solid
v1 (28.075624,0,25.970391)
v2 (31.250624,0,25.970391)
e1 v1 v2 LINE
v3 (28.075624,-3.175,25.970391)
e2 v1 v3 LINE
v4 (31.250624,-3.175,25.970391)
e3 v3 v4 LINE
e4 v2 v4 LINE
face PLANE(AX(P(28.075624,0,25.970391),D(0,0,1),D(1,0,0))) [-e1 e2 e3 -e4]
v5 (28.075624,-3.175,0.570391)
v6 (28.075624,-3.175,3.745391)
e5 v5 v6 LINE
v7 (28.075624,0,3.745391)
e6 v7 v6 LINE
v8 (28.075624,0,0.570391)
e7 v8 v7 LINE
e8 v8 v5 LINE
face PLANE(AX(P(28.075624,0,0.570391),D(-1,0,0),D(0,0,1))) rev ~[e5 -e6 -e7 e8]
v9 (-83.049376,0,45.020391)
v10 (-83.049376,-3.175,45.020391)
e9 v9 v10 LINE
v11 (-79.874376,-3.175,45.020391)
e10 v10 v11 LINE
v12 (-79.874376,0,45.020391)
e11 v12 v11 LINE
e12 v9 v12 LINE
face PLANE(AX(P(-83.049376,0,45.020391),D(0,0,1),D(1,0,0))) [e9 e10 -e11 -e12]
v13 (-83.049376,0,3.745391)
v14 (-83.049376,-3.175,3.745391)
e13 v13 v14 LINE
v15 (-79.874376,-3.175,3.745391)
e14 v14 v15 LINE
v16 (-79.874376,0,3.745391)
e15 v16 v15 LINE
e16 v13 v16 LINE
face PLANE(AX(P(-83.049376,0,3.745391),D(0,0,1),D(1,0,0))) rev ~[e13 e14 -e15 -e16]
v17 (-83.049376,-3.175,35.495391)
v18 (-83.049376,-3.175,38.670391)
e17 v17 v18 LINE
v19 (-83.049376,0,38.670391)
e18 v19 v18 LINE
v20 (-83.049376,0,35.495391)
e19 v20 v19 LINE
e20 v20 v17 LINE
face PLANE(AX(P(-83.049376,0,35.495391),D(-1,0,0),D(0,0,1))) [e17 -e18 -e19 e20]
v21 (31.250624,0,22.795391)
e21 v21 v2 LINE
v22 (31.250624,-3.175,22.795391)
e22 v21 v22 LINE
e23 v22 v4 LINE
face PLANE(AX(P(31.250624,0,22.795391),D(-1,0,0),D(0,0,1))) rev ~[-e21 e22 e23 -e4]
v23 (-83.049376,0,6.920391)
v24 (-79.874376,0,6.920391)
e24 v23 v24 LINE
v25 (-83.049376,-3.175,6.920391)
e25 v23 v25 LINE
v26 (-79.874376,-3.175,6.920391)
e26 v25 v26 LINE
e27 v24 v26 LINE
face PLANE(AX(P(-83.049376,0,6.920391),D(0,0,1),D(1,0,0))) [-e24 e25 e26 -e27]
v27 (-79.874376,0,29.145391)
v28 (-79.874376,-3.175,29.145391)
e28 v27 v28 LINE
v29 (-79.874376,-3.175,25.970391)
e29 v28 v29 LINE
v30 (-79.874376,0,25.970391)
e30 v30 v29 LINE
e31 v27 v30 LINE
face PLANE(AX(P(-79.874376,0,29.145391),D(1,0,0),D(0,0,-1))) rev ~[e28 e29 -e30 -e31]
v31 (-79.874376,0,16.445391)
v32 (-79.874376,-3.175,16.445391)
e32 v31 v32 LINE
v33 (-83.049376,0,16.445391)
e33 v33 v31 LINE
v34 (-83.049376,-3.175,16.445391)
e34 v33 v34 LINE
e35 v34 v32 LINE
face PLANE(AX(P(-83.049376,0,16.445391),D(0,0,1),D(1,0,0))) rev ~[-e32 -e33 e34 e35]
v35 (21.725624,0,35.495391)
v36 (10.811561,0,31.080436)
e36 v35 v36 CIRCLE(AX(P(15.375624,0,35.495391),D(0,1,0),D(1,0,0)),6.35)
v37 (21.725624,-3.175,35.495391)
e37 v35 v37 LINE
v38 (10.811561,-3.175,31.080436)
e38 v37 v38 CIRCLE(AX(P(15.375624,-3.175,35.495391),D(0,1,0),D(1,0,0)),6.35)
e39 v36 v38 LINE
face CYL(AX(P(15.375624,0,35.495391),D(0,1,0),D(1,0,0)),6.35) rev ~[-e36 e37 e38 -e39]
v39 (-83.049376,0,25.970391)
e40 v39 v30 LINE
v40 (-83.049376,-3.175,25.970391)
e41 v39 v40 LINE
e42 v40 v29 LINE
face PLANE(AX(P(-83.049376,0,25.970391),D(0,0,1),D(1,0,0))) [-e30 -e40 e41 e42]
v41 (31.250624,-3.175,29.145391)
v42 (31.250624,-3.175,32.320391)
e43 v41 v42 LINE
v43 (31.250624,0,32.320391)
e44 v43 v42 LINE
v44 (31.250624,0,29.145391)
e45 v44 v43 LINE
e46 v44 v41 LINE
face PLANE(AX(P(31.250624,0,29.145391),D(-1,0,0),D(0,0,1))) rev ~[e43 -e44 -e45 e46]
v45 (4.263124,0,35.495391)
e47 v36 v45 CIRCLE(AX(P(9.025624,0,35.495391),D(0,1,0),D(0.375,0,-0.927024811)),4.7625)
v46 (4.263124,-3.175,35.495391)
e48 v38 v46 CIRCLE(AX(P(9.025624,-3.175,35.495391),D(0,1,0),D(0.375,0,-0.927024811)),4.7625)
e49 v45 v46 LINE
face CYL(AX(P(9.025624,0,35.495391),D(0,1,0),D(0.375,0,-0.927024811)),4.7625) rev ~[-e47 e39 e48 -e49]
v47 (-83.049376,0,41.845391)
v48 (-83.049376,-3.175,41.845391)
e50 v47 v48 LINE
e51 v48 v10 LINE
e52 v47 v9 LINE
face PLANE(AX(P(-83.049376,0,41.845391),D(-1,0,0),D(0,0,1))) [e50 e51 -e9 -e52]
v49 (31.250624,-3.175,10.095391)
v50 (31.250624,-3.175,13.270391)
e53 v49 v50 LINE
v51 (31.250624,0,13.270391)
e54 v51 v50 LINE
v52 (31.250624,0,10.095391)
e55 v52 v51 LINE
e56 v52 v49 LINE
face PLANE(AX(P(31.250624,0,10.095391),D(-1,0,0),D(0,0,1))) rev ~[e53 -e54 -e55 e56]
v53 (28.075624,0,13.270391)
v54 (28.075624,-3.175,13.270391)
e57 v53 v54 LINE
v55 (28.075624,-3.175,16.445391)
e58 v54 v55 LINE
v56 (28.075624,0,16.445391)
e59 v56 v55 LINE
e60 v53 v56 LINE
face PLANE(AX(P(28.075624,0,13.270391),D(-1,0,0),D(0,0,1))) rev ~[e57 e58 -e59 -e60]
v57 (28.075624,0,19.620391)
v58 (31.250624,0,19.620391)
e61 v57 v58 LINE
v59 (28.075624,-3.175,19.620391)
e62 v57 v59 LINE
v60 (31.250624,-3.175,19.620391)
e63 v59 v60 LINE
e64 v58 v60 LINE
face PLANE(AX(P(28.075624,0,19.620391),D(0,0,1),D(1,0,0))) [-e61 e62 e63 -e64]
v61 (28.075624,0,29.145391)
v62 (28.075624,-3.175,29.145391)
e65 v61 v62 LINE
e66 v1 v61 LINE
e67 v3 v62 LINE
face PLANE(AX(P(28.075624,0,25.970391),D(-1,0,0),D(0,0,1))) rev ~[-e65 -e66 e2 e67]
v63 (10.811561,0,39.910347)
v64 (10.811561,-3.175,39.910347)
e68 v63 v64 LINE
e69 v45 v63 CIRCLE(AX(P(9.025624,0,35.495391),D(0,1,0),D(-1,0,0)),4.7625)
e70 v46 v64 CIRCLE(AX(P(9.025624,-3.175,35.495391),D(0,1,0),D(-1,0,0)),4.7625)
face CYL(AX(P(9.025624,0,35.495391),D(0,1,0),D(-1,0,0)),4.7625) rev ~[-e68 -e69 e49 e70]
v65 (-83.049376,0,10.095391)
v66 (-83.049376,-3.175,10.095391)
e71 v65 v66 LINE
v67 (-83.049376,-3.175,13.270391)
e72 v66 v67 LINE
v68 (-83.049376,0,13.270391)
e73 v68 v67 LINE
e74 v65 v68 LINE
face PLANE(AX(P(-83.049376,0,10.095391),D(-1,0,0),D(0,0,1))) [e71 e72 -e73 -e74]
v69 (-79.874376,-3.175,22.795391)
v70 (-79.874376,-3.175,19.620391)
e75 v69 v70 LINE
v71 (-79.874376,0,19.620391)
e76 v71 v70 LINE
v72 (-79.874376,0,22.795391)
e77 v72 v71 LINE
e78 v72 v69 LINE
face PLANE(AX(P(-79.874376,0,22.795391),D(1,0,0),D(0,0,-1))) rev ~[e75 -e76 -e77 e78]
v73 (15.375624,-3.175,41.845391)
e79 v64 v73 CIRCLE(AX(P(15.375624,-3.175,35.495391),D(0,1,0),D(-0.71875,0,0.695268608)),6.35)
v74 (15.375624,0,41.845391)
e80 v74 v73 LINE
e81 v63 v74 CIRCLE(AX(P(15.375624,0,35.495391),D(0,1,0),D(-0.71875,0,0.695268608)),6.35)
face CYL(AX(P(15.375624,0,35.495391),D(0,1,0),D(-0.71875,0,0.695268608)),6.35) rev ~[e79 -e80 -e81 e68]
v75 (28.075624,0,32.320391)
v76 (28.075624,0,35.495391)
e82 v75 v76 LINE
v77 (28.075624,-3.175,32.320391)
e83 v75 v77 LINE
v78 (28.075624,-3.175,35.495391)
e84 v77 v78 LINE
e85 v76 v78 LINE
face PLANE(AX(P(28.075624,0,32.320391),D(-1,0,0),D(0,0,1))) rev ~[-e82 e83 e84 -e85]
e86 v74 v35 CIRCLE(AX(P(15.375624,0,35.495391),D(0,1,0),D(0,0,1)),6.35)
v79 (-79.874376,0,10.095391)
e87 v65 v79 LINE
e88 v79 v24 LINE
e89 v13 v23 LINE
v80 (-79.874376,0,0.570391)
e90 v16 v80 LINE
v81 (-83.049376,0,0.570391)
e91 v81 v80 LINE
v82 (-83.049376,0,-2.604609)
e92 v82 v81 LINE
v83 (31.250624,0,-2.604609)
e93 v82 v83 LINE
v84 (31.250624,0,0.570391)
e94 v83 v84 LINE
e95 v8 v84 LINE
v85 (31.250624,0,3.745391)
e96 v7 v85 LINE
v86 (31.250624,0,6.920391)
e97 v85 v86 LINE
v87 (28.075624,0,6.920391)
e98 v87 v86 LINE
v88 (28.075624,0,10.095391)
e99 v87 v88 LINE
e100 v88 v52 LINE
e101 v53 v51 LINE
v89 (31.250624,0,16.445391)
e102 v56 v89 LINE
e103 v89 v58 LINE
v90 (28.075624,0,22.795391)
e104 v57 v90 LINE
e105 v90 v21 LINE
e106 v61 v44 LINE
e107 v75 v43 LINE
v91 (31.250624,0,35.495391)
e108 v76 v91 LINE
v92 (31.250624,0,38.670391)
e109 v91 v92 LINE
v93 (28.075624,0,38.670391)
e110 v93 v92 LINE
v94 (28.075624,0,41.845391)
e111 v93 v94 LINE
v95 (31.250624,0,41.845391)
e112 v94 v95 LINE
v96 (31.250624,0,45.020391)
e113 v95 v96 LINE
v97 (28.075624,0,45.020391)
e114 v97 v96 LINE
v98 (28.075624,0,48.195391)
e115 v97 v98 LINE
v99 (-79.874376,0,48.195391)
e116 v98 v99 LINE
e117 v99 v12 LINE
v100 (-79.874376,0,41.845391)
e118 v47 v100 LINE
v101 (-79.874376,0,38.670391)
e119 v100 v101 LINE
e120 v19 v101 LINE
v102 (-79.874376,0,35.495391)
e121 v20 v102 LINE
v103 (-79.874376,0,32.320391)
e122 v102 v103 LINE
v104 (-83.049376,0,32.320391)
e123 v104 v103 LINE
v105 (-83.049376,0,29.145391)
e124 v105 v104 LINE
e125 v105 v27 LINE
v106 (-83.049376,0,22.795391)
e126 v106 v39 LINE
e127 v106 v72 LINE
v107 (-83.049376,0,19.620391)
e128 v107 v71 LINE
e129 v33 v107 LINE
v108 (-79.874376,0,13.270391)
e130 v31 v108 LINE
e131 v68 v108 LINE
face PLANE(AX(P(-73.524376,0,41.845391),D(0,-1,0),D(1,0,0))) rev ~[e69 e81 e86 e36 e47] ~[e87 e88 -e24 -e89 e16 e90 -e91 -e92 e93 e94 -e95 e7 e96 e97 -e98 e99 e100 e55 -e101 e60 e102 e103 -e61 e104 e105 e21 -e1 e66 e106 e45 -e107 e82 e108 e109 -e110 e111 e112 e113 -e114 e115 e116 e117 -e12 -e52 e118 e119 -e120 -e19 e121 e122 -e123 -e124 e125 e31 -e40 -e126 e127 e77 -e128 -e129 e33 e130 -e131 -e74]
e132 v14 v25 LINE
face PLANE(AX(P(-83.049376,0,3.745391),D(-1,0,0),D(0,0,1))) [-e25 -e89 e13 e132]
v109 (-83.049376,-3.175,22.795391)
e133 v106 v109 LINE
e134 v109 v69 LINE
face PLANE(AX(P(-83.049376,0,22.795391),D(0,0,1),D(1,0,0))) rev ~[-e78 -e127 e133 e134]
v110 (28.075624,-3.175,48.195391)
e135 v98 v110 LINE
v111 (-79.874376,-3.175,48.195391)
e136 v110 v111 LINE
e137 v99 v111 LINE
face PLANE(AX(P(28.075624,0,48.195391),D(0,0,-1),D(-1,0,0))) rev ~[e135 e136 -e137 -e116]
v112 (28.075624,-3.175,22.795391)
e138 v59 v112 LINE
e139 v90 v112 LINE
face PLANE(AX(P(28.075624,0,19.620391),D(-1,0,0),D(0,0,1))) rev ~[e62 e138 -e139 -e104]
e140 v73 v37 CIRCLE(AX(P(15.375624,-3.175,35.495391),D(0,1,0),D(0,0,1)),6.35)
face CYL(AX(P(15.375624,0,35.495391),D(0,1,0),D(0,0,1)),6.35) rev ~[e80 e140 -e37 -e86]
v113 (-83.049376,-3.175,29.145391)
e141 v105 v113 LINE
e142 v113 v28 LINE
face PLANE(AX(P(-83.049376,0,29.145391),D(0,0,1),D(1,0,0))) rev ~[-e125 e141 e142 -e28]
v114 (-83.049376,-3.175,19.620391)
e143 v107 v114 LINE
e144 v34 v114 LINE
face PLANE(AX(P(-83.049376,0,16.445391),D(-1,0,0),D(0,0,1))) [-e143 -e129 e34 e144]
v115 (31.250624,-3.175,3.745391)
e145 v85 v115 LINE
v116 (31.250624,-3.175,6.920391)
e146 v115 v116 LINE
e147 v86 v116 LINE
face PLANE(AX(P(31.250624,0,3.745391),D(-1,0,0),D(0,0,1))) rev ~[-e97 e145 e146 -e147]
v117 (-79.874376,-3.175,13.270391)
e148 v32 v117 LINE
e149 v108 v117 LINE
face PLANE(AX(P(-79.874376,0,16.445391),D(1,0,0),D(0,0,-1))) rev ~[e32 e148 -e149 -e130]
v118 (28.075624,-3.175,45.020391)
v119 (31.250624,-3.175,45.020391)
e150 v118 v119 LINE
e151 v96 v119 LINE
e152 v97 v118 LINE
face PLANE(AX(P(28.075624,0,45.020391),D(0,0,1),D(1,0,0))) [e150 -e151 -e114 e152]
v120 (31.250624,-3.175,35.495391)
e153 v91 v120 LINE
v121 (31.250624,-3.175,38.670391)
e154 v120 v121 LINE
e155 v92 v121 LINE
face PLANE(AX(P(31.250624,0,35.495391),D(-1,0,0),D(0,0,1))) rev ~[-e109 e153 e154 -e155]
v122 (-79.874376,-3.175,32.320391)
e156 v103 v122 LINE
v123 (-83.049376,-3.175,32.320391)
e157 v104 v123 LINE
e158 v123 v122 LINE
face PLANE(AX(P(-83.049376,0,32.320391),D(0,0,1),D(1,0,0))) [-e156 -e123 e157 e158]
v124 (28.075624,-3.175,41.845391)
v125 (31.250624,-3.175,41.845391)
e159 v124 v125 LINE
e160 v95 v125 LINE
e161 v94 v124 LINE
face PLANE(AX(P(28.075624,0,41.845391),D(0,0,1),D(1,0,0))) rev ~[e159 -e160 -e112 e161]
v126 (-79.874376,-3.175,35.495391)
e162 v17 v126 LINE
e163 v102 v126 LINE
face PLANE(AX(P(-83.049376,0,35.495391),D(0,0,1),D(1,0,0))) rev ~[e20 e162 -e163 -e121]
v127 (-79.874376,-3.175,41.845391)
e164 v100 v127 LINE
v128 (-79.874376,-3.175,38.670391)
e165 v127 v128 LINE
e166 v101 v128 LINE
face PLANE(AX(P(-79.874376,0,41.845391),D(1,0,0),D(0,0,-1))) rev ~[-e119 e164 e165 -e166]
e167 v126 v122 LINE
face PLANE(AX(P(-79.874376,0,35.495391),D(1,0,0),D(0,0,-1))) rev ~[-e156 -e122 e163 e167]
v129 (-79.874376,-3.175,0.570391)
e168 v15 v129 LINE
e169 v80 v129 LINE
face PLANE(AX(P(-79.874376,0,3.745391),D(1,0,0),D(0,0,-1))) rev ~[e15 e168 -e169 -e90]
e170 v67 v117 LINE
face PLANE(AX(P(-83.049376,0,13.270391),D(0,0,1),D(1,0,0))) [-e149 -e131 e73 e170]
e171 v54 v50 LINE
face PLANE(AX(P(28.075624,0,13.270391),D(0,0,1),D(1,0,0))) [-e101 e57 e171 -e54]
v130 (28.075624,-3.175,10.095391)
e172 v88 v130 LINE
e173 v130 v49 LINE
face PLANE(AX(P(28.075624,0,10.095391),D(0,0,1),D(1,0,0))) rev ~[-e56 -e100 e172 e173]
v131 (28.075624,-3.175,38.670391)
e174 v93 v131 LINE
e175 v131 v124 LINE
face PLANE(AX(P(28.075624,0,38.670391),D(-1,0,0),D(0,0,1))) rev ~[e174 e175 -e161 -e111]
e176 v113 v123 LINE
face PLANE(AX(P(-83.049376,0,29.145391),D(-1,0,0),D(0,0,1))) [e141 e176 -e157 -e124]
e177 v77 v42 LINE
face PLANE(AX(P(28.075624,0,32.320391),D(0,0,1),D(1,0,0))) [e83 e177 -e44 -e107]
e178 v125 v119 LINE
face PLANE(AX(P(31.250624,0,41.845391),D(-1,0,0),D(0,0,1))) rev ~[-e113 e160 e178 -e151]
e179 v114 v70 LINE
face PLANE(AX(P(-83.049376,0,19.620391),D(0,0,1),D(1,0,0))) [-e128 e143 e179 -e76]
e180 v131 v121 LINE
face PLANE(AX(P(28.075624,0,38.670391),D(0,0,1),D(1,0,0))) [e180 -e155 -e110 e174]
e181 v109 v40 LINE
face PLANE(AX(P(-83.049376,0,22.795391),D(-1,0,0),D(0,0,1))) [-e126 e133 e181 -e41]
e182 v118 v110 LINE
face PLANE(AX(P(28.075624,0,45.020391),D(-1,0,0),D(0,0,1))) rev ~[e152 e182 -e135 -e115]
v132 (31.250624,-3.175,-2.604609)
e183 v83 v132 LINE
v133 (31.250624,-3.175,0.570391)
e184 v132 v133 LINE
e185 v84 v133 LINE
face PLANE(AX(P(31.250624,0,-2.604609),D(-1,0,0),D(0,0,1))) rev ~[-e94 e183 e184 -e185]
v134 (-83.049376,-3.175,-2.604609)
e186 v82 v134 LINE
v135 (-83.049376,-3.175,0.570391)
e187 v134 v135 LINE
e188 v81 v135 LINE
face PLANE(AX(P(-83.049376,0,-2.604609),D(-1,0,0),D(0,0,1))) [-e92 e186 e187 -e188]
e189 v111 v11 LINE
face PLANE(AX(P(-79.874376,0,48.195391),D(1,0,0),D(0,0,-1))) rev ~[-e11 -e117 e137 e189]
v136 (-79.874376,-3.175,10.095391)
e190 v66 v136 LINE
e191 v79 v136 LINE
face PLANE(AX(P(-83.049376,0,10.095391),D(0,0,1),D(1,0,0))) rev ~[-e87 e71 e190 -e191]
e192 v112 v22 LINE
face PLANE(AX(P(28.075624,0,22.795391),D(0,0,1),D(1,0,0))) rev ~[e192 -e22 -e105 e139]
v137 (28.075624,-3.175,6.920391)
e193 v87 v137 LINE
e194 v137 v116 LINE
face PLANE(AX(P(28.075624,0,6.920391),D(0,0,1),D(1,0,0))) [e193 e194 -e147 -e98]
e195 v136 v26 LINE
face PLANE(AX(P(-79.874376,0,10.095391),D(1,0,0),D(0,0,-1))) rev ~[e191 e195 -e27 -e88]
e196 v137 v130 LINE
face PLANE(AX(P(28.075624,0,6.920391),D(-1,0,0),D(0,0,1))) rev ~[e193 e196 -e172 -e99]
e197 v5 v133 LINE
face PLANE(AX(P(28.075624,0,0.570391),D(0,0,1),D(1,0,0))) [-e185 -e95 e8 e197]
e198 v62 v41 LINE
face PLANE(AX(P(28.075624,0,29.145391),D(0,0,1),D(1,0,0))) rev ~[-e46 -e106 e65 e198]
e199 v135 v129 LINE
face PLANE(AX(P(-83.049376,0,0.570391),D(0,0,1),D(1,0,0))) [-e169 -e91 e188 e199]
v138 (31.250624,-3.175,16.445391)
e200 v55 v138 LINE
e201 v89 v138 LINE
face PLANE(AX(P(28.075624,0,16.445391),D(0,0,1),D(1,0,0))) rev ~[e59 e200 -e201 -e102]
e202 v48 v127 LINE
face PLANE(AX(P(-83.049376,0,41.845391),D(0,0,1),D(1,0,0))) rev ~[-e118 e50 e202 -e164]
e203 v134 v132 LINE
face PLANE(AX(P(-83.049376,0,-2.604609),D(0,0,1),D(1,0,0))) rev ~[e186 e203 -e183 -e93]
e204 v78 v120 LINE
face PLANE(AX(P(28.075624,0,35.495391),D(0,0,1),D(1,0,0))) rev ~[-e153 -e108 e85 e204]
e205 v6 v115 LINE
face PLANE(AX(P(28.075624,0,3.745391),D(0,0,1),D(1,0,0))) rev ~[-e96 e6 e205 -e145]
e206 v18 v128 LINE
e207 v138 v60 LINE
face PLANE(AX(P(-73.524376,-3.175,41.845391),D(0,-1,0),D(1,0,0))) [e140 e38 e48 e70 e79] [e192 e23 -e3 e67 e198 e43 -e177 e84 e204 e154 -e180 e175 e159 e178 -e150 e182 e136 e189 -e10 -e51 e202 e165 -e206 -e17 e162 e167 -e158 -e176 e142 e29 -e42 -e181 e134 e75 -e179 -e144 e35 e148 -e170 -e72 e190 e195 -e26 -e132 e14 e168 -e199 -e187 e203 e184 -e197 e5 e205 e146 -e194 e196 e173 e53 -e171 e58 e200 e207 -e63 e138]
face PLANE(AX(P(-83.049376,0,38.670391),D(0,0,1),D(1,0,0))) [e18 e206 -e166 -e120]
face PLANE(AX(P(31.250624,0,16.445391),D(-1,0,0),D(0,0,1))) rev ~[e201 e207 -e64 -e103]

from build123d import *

# Parameters (mm, degrees)
F0_W     = 3.175
F0_H     = 3.175
F0_W_2   = 69.85
F0_H_2   = 12.7
F1_DEPTH = 3.175


with BuildPart() as f1:
    # F0 (on Front) → F1 (new body)
    with BuildSketch(Plane.XZ):
        Polygon((-67.174376142, 48.1953912664), (-79.874376142, 48.1953912664), (-79.874376142, 45.0203912664), (-79.874376142, 41.8453912664), (-79.874376142, 38.6703912664), (-79.874376142, 35.4953912664), (-67.174376142, 35.4953912664), align=None)
        with Locations((-81.461876142, 43.4328912664)):
            Rectangle(F0_W, F0_H)
        with Locations((-32.249376142, 41.8453912664)):
            Rectangle(F0_W_2, F0_H_2)
        with BuildLine():
            Line((15.375623858, 48.1953912664), (2.675623858, 48.1953912664))
            Line((2.675623858, 48.1953912664), (2.675623858, 35.4953912664))
            Line((2.675623858, 35.4953912664), (4.263123858, 35.4953912664))
            ThreePointArc((4.263123858, 35.4953912664), (6.3633054223, 39.4442476574), (10.811561358, 39.9103469283))
            ThreePointArc((10.811561358, 39.9103469283), (12.8969617645, 41.3416494053), (15.375623858, 41.8453912664))
            Line((15.375623858, 41.8453912664), (15.375623858, 48.1953912664))
        make_face()
        with BuildLine():
            Line((2.675623858, 35.4953912664), (-67.174376142, 35.4953912664))
            Line((-67.174376142, 35.4953912664), (-67.174376142, -2.6046087336))
            Line((-67.174376142, -2.6046087336), (28.075623858, -2.6046087336))
            Line((28.075623858, -2.6046087336), (28.075623858, 0.5703912664))
            Line((28.075623858, 0.5703912664), (28.075623858, 3.7453912664))
            Line((28.075623858, 3.7453912664), (28.075623858, 6.9203912664))
            Line((28.075623858, 6.9203912664), (28.075623858, 10.0953912664))
            Line((28.075623858, 10.0953912664), (28.075623858, 13.2703912664))
            Line((28.075623858, 13.2703912664), (28.075623858, 16.4453912664))
            Line((28.075623858, 16.4453912664), (28.075623858, 19.6203912664))
            Line((28.075623858, 19.6203912664), (28.075623858, 22.7953912664))
            Line((28.075623858, 22.7953912664), (28.075623858, 25.9703912664))
            Line((28.075623858, 25.9703912664), (28.075623858, 29.1453912664))
            Line((28.075623858, 29.1453912664), (28.075623858, 32.3203912664))
            Line((28.075623858, 32.3203912664), (28.075623858, 35.4953912664))
            Line((28.075623858, 35.4953912664), (21.725623858, 35.4953912664))
            ThreePointArc((21.725623858, 35.4953912664), (17.756873858, 29.6087837173), (10.811561358, 31.0804356046))
            ThreePointArc((10.811561358, 31.0804356046), (6.3633054223, 31.5465348754), (4.263123858, 35.4953912664))
            Line((4.263123858, 35.4953912664), (2.675623858, 35.4953912664))
        make_face()
        Polygon((-67.174376142, -2.6046087336), (-67.174376142, 35.4953912664), (-79.874376142, 35.4953912664), (-79.874376142, 32.3203912664), (-79.874376142, 29.1453912664), (-79.874376142, 25.9703912664), (-79.874376142, 22.7953912664), (-79.874376142, 19.6203912664), (-79.874376142, 16.4453912664), (-79.874376142, 13.2703912664), (-79.874376142, 10.0953912664), (-79.874376142, 6.9203912664), (-79.874376142, 3.7453912664), (-79.874376142, 0.5703912664), (-79.874376142, -2.6046087336), align=None)
        with Locations((-81.461876142, 37.0828912664)):
            Rectangle(F0_W, F0_H)
        with BuildLine():
            Line((28.075623858, 48.1953912664), (15.375623858, 48.1953912664))
            Line((15.375623858, 48.1953912664), (15.375623858, 41.8453912664))
            ThreePointArc((15.375623858, 41.8453912664), (19.8657519185, 39.985519327), (21.725623858, 35.4953912664))
            Line((21.725623858, 35.4953912664), (28.075623858, 35.4953912664))
            Line((28.075623858, 35.4953912664), (28.075623858, 38.6703912664))
            Line((28.075623858, 38.6703912664), (28.075623858, 41.8453912664))
            Line((28.075623858, 41.8453912664), (28.075623858, 45.0203912664))
            Line((28.075623858, 45.0203912664), (28.075623858, 48.1953912664))
        make_face()
        with Locations((-81.461876142, -1.0171087336)):
            Rectangle(F0_W, F0_H)
        with Locations((29.663123858, -1.0171087336)):
            Rectangle(F0_W, F0_H)
        with Locations((-81.461876142, 30.7328912664)):
            Rectangle(F0_W, F0_H)
        with Locations((29.663123858, 43.4328912664)):
            Rectangle(F0_W, F0_H)
        with Locations((29.663123858, 37.0828912664)):
            Rectangle(F0_W, F0_H)
        with Locations((-81.461876142, 5.3328912664)):
            Rectangle(F0_W, F0_H)
        with Locations((29.663123858, 5.3328912664)):
            Rectangle(F0_W, F0_H)
        with Locations((-81.461876142, 24.3828912664)):
            Rectangle(F0_W, F0_H)
        with Locations((29.663123858, 30.7328912664)):
            Rectangle(F0_W, F0_H)
        with Locations((-81.461876142, 11.6828912664)):
            Rectangle(F0_W, F0_H)
        with Locations((29.663123858, 11.6828912664)):
            Rectangle(F0_W, F0_H)
        with Locations((-81.461876142, 18.0328912664)):
            Rectangle(F0_W, F0_H)
        with Locations((29.663123858, 24.3828912664)):
            Rectangle(F0_W, F0_H)
        with Locations((29.663123858, 18.0328912664)):
            Rectangle(F0_W, F0_H)
    extrude(amount=F1_DEPTH)


solid = f1.part
